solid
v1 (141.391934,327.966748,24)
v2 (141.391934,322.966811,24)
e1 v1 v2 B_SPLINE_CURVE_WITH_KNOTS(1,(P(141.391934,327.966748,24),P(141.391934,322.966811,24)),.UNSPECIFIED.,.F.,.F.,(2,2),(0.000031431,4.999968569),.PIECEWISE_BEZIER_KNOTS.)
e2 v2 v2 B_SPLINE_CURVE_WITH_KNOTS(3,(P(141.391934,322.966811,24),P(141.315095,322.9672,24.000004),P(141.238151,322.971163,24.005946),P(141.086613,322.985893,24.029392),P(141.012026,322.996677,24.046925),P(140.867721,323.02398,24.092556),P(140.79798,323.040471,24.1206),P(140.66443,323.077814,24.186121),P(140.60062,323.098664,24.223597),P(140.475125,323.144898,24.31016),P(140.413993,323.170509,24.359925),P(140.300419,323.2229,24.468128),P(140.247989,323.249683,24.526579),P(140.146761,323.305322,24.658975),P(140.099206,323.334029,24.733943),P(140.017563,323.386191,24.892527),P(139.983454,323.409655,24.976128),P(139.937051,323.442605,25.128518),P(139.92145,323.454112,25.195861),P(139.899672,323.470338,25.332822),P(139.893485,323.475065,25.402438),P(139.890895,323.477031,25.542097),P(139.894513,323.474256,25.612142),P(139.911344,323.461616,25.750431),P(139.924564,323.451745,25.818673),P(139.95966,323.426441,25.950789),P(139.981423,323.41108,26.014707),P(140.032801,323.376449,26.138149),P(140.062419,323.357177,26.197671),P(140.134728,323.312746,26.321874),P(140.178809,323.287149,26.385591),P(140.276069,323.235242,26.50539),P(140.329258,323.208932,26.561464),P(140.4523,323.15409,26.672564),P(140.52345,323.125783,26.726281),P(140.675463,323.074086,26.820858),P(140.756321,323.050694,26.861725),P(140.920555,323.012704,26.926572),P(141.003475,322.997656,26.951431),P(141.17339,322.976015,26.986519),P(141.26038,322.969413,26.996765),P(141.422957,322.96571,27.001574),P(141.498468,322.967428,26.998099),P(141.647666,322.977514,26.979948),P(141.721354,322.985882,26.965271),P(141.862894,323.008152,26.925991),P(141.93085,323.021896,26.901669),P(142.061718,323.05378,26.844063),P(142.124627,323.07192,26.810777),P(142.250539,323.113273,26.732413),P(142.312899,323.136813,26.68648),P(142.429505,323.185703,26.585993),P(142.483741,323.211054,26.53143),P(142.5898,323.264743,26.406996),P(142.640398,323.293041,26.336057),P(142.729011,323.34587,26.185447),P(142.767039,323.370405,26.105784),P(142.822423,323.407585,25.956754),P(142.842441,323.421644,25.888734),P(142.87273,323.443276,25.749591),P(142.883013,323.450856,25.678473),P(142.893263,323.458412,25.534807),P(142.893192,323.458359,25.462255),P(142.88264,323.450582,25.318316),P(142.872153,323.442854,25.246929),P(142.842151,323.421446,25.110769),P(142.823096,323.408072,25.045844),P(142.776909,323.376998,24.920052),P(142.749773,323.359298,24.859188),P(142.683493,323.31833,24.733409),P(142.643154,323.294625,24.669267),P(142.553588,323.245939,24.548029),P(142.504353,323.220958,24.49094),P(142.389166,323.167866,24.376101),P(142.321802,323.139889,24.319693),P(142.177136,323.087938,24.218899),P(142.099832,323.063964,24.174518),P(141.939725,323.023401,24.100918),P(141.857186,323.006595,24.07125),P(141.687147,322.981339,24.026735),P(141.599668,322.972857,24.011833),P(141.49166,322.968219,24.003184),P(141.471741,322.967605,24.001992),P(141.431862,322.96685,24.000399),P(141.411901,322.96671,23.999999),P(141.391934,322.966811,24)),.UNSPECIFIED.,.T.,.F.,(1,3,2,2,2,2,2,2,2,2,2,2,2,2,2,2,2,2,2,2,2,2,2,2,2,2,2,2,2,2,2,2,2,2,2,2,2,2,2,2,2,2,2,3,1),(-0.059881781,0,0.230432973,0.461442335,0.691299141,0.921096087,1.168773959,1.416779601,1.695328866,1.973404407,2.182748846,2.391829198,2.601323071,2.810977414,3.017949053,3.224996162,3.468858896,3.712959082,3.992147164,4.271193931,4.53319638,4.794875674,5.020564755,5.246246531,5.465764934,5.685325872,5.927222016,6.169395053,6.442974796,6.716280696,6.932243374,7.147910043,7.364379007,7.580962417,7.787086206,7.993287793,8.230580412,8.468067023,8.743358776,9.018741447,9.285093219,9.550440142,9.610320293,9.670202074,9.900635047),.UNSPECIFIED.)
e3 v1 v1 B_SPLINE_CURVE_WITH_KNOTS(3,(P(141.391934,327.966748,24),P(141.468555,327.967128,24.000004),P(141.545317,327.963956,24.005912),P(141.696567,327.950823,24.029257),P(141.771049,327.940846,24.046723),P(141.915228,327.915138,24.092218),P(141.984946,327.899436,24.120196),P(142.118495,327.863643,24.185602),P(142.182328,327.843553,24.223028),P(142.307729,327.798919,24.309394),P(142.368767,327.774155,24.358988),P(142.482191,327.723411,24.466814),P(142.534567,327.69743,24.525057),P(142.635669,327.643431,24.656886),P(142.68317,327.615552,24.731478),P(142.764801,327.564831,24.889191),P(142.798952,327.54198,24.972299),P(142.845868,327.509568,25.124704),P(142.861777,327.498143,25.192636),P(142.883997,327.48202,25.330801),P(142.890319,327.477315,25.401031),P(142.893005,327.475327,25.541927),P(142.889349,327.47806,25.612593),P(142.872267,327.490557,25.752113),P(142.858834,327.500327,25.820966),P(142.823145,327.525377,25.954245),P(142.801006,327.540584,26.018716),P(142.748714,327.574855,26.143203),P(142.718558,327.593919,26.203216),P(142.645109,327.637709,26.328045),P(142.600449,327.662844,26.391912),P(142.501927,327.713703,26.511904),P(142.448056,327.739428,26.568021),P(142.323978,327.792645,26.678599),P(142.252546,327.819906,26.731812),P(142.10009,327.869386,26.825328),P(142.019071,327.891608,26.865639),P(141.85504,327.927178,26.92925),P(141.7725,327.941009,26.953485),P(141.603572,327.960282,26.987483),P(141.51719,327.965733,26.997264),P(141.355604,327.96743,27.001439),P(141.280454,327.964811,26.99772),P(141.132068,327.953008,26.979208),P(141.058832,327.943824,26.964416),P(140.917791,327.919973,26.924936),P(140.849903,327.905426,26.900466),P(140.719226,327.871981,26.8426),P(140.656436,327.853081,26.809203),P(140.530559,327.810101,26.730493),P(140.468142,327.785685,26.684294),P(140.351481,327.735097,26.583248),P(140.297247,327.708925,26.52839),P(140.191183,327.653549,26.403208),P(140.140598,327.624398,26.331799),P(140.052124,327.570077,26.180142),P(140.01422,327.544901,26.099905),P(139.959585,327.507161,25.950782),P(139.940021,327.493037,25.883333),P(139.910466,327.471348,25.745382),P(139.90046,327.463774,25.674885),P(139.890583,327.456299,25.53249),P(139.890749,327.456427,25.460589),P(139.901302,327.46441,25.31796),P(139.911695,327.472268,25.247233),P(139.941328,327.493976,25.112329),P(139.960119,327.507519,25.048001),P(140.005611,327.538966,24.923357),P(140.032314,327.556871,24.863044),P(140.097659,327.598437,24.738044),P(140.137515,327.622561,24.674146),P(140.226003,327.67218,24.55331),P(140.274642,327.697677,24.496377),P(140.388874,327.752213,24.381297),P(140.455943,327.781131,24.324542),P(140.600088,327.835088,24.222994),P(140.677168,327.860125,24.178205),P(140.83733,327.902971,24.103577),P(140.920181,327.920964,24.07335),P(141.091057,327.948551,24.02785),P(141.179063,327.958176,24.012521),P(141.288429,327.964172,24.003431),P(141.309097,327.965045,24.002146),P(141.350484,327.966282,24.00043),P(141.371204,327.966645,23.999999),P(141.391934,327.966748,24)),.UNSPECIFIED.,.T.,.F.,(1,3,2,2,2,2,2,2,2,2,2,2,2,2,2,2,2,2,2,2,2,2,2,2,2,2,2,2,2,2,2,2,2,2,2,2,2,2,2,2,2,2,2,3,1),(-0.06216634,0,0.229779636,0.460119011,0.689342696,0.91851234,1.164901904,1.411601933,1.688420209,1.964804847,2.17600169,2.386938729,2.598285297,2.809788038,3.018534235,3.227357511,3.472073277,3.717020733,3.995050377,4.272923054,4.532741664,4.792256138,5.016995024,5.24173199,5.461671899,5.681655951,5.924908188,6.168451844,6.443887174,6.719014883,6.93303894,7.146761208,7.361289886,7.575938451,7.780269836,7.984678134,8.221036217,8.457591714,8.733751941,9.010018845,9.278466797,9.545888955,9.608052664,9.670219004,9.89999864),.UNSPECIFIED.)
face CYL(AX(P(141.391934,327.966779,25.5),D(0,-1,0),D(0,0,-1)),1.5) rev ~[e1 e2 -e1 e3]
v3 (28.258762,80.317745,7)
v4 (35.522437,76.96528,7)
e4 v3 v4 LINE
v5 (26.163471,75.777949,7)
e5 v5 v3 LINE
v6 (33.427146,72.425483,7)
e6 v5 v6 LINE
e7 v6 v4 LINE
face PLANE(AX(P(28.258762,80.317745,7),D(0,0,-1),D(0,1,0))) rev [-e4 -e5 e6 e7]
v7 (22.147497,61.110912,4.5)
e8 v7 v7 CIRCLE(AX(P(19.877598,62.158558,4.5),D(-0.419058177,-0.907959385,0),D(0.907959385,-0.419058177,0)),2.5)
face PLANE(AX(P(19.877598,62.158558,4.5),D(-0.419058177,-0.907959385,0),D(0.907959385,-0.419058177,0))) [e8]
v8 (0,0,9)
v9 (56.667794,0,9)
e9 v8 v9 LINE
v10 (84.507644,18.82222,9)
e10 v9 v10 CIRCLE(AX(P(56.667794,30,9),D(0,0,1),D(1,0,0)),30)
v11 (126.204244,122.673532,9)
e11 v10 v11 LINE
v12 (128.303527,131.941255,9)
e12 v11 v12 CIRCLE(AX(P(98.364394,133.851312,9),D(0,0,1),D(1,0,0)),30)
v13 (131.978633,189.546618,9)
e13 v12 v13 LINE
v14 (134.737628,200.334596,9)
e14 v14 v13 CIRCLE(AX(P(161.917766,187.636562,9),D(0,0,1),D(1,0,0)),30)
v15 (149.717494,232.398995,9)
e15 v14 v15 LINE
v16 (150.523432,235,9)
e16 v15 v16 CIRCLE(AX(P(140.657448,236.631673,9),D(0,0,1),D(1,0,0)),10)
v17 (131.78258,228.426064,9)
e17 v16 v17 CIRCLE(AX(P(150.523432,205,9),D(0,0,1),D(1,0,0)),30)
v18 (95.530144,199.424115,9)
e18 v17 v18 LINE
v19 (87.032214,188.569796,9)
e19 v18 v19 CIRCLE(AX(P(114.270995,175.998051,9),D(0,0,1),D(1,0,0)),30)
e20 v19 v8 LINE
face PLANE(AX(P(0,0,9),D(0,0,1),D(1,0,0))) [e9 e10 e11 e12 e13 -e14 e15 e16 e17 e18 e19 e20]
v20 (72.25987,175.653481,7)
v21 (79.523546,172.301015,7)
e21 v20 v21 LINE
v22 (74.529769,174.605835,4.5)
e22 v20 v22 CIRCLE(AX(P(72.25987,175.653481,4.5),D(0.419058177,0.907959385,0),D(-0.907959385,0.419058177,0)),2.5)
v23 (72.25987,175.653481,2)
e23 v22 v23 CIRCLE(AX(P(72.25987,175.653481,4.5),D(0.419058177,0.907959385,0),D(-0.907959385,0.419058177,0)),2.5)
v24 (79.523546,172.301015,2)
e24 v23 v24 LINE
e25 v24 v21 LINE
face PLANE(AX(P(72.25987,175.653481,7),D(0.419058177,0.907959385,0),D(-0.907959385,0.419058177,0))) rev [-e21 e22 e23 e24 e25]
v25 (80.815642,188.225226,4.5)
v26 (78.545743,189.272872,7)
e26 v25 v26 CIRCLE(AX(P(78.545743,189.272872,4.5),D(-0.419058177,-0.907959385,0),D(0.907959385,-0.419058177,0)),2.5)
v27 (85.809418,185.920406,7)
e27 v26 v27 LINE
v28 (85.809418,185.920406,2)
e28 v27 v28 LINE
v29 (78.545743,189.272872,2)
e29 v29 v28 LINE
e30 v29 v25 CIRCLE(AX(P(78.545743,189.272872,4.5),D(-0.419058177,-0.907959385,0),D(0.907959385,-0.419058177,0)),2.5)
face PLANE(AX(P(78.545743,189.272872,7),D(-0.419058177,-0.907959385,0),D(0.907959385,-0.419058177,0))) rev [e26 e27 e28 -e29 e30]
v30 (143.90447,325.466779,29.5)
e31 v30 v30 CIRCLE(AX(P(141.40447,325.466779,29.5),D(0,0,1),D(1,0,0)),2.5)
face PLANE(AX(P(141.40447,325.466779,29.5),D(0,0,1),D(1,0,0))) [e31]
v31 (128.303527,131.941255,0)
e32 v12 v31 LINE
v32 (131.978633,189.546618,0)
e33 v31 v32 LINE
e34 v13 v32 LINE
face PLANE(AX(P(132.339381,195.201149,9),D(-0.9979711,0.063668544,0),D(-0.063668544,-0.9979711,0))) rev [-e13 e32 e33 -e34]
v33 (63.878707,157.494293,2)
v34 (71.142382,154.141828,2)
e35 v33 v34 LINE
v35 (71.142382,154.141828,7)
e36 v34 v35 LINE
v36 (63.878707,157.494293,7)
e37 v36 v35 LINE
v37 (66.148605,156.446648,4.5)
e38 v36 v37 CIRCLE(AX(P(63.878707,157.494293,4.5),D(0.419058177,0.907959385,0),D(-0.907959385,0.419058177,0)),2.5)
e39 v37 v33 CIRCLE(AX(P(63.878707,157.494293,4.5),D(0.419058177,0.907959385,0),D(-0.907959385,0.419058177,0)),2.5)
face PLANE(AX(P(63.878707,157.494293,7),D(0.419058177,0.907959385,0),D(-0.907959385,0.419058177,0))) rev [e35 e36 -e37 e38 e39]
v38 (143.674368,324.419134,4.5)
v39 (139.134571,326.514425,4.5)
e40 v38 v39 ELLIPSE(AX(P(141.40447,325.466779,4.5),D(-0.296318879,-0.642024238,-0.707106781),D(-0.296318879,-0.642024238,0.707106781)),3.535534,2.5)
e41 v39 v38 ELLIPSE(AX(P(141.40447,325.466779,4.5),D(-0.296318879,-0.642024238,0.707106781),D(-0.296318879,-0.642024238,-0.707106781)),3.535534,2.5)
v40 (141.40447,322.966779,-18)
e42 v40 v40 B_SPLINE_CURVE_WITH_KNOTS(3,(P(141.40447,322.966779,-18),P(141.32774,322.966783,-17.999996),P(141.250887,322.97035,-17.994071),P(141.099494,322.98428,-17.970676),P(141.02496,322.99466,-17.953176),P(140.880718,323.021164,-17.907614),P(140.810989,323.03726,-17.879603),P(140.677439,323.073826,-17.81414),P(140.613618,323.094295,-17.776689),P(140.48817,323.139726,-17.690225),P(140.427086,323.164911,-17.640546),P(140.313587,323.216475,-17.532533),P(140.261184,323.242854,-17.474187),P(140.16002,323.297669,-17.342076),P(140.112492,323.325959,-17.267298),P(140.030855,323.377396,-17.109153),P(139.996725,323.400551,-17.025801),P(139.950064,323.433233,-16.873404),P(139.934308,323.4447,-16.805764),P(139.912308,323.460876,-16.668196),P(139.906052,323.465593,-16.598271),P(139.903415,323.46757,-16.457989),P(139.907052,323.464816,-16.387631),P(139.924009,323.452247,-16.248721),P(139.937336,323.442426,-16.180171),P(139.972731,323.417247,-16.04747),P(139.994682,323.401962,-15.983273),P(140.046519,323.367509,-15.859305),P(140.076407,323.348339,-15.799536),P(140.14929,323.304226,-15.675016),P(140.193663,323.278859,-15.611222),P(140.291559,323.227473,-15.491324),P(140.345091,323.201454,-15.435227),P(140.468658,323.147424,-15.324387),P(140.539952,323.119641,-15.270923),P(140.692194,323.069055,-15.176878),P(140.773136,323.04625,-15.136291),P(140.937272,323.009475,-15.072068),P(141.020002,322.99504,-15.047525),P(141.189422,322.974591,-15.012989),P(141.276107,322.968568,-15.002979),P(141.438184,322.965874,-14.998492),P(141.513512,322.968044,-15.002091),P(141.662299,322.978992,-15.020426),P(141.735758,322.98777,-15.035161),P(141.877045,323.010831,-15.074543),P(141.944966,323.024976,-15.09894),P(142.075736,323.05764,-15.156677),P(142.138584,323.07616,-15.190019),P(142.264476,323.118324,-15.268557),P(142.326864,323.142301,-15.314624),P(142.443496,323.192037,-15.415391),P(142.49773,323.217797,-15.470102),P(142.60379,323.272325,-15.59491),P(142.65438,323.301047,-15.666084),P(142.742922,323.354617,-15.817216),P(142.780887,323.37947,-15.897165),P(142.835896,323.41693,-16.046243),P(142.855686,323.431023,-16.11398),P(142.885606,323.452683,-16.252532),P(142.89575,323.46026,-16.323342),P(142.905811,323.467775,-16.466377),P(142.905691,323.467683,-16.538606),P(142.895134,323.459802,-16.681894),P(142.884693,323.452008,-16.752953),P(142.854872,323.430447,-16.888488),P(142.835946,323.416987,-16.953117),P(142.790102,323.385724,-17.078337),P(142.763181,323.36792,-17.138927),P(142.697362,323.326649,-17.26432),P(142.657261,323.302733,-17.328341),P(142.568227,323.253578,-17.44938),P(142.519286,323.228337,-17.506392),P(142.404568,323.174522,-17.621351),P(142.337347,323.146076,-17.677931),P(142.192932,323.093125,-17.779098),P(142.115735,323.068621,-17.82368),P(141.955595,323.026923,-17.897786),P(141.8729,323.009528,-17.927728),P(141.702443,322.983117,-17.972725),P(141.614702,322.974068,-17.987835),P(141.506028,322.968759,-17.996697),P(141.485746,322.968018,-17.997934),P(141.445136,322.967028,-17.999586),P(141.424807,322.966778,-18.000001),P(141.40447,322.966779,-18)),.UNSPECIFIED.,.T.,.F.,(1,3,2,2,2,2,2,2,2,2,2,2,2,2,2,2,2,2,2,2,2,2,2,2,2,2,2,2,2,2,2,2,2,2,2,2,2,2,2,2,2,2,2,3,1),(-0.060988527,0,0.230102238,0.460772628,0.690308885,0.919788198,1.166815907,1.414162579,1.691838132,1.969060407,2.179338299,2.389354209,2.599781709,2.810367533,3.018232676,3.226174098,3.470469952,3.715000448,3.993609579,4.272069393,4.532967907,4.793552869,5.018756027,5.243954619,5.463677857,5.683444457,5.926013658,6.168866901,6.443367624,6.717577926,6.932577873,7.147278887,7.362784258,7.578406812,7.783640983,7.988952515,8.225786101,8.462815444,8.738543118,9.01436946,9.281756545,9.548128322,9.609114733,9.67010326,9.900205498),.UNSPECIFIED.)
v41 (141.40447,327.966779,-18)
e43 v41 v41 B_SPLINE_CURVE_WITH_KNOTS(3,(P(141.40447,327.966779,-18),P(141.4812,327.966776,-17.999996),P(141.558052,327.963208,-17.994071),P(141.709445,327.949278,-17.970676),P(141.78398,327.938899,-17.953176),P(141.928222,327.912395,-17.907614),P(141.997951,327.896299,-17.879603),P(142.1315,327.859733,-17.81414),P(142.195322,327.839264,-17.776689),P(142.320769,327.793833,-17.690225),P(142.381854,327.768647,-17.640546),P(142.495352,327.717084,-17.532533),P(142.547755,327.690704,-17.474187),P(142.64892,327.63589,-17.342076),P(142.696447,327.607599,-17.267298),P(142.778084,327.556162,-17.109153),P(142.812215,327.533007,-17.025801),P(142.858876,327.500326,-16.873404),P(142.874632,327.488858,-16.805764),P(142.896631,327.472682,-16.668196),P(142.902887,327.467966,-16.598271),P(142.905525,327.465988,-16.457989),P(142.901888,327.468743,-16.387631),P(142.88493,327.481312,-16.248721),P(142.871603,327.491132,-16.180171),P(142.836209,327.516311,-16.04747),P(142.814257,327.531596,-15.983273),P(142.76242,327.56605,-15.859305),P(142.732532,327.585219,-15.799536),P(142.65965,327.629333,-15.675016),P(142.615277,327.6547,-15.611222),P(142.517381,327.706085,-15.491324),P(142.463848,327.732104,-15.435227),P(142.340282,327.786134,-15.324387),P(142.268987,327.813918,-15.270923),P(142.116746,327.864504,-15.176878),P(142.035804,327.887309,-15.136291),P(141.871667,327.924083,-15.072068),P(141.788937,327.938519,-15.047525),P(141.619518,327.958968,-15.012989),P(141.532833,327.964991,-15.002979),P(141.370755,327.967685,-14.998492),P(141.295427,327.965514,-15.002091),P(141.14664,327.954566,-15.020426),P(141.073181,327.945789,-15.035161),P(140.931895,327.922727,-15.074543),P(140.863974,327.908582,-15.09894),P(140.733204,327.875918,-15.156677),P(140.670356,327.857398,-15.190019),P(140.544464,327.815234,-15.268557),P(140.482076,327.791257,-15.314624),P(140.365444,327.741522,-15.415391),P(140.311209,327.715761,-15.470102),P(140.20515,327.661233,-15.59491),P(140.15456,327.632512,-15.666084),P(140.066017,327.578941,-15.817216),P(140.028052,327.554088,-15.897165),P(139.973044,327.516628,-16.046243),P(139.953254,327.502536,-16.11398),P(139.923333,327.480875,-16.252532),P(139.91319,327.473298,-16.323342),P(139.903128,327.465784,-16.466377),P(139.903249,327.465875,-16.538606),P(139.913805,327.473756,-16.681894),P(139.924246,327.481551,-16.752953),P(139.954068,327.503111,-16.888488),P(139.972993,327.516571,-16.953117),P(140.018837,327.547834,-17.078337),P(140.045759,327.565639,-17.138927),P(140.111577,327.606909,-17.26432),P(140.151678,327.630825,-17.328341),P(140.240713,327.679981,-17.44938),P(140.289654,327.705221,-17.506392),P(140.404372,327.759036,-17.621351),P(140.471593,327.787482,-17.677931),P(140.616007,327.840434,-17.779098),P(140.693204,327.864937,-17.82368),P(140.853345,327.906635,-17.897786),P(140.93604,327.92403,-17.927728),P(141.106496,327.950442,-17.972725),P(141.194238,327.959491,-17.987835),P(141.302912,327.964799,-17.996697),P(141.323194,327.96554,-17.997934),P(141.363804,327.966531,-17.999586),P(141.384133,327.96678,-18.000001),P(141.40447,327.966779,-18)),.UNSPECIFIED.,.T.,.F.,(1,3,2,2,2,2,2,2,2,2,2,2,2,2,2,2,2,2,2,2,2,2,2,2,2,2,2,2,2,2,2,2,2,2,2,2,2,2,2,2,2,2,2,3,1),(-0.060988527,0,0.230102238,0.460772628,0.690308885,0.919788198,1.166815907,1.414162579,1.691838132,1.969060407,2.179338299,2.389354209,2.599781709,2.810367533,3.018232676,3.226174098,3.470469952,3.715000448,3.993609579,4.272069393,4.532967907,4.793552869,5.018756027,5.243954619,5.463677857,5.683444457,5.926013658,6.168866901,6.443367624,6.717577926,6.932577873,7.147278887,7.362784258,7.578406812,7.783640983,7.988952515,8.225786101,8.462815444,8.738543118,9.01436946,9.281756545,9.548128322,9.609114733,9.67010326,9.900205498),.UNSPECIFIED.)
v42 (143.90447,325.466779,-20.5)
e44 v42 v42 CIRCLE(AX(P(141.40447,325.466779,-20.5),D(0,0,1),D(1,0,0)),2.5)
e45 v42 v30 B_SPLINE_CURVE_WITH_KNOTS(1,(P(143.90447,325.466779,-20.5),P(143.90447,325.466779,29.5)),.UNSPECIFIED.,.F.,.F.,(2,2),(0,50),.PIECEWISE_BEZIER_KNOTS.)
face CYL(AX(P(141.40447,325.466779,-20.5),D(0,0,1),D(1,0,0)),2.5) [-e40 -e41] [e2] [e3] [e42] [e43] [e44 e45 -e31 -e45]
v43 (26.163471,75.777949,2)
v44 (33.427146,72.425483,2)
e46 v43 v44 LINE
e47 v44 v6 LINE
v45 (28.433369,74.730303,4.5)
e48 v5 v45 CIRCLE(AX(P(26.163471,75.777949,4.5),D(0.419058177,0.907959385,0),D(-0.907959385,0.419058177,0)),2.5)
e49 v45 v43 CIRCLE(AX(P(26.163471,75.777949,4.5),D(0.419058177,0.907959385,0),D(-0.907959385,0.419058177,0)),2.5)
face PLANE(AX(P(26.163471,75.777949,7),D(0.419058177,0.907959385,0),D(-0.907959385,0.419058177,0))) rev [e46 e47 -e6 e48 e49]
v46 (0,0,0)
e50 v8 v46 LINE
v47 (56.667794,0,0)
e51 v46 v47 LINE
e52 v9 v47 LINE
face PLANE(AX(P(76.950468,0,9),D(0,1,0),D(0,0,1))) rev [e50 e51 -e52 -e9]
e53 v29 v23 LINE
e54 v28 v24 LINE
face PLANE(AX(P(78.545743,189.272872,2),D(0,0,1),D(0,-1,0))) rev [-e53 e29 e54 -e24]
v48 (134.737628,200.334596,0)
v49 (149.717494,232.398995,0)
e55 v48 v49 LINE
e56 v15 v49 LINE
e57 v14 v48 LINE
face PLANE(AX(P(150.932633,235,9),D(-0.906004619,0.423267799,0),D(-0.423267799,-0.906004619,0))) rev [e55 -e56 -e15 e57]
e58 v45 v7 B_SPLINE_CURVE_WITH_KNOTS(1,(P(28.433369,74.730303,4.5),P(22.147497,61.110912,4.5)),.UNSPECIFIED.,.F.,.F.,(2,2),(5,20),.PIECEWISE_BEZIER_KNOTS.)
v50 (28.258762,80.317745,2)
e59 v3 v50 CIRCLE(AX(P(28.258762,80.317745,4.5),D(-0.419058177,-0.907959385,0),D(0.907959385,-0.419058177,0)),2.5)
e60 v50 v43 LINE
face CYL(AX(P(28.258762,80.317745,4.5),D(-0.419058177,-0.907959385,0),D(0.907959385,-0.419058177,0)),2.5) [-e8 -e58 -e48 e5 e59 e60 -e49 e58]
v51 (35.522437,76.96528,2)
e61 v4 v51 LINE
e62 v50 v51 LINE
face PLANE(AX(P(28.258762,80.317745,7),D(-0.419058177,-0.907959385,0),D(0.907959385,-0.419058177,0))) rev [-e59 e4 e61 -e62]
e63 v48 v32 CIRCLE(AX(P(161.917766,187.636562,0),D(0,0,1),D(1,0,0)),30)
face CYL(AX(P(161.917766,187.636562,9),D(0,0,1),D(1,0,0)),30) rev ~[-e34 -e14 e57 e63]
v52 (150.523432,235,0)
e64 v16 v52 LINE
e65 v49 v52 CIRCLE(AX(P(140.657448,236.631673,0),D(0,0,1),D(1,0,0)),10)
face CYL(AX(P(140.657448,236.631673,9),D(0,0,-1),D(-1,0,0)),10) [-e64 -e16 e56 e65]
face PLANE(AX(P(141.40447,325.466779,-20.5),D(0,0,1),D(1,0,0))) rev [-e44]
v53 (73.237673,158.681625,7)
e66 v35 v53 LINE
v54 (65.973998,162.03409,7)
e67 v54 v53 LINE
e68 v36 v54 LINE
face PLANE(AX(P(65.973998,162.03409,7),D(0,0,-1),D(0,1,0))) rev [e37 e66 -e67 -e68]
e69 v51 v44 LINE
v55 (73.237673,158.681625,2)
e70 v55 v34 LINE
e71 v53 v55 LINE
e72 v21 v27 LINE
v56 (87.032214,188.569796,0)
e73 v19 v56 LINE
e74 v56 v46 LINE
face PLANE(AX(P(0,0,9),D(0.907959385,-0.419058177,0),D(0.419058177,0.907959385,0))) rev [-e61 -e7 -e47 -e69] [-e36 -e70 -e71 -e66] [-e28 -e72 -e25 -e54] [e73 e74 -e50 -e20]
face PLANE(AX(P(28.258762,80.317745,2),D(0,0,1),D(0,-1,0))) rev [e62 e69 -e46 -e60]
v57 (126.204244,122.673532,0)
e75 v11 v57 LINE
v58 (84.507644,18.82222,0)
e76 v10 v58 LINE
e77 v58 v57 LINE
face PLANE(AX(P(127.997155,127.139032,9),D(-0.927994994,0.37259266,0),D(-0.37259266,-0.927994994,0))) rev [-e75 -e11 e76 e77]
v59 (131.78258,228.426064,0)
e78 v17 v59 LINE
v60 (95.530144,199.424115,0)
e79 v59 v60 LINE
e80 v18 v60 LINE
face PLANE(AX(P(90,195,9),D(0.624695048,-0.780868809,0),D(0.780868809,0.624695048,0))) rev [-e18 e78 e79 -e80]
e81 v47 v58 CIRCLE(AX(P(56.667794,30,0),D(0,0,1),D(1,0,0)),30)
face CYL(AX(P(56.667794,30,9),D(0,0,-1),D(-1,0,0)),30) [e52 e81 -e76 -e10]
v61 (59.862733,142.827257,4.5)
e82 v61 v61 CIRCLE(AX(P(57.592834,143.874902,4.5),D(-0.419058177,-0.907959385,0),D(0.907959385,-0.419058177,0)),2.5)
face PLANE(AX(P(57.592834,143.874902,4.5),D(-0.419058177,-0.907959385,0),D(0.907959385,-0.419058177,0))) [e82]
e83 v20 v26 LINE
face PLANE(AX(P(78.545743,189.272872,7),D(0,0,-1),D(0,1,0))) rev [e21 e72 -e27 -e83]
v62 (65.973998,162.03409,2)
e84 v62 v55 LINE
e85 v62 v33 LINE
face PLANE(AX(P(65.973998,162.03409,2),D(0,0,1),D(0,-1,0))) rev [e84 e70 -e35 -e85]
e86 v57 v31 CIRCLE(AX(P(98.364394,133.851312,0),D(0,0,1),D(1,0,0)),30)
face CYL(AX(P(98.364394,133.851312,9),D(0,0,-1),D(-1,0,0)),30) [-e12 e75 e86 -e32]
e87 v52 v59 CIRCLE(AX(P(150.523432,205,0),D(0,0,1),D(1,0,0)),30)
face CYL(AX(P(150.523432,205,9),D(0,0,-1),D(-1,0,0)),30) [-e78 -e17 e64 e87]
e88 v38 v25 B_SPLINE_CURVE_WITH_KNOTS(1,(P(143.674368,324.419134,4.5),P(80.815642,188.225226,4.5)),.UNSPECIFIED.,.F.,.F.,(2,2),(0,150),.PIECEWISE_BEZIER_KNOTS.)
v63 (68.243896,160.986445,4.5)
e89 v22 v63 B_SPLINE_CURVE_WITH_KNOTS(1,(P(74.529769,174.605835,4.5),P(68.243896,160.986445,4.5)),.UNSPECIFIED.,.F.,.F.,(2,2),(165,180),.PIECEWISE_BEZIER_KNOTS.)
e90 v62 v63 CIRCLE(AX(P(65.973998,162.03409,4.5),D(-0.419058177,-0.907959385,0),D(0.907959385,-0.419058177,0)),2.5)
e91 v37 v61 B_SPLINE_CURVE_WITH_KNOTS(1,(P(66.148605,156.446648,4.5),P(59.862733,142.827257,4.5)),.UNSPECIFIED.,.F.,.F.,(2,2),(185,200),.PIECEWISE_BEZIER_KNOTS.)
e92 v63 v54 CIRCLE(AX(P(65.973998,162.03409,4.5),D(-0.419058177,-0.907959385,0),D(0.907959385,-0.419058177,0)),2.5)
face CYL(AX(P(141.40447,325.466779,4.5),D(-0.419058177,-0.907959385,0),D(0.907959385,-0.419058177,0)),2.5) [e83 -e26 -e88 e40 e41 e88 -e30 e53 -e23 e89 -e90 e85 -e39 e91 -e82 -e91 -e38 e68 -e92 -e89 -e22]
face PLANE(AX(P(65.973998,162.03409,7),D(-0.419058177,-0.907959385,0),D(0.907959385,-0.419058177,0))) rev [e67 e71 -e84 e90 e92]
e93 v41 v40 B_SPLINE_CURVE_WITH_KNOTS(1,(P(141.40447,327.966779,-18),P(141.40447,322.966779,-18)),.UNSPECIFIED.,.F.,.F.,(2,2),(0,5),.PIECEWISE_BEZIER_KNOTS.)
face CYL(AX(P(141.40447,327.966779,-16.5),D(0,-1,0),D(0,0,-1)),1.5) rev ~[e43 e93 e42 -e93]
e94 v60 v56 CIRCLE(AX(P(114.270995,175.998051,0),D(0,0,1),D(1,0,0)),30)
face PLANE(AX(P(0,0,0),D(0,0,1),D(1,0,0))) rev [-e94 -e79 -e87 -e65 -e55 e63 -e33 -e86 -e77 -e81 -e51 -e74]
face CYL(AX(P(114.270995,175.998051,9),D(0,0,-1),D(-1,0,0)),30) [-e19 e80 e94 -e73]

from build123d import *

# Parameters (mm, degrees)
BOSS_EXTRU_1_DEPTH           = 9
ESQUISSE36_W                 = 5
ESQUISSE36_H                 = 5
ESQUISSE36_H_2               = 15
BOSS_EXTRU_4_DEPTH           = 8
BALAYAGE2_PROFILE_R          = 2.5
BALAYAGE3_PROFILE_R          = 2.5
CONG_2_R                     = 30
CONG_3_R                     = 10
BALAYAGE4_PROFILE_R          = 2.5
ENL_V_MAT_EXTRU_2_DEPTH      = 363.063201398
ENL_V_MAT_EXTRU_2_DEPTH_BACK = 10
ESQUISSE103_R                = 1.5


with BuildPart() as part:
    # Esquisse1 → Boss.-Extru.1 (new body)
    with BuildSketch(Plane.XY):
        Polygon((0, 0), (90, 195), (140, 235), (150.932632942, 235), (132.339381175, 195.201149163), (127.997155304, 127.139031538), (76.950468366, 0), align=None)
    extrude(amount=BOSS_EXTRU_1_DEPTH)

    # Esquisse36 → Boss.-Extru.4 (add)
    with BuildSketch(Plane(origin=(0, 0, 0), x_dir=(0, 0, 1), z_dir=(-0.9079593845004518, 0.4190581774617469, 0))):
        with Locations((4.5, 172.267315949)):
            Rectangle(ESQUISSE36_W, ESQUISSE36_H)
        with Locations((4.5, 82.267315949)):
            Rectangle(ESQUISSE36_W, ESQUISSE36_H)
        with Locations((4.5, 197.267315949)):
            Rectangle(ESQUISSE36_W, ESQUISSE36_H_2)
    extrude(amount=BOSS_EXTRU_4_DEPTH)

    # Balayage2: sweep along a path in Esquisse37
    with BuildLine(Plane(origin=(-7.263675076, 3.35246542, 0), x_dir=(0, 0, 1), z_dir=(-0.9079593845004523, 0.4190581774617459, 0))) as balayage2_path:
        Line((4.5, 354.767315949), (4.5, 154.767315949))
    # Balayage2 profile (on start of the path) → Balayage2 (sweep)
    with BuildSketch(Plane(origin=(141.404469769, 325.46677925, 4.5), x_dir=(-0.9079593845004521, 0.41905817746174584, 0), z_dir=(-0.4190581774617459, -0.9079593845004523, 0))):
        Circle(BALAYAGE2_PROFILE_R)
    sweep(path=balayage2_path.line)

    # Balayage3: sweep along a path in Esquisse50
    with BuildLine(Plane(origin=(-7.263675076, 3.35246542, 0), x_dir=(0, 0, 1), z_dir=(-0.9079593845004512, 0.41905817746174806, 0))) as balayage3_path:
        Line((4.5, 84.767315949), (4.5, 64.767315949))
    # Balayage3 profile (on start of the path) → Balayage3 (sweep)
    with BuildSketch(Plane(origin=(28.258761854, 80.317745435, 4.5), x_dir=(-0.9079593845004512, 0.41905817746174806, 0), z_dir=(-0.41905817746174806, -0.9079593845004512, 0))):
        Circle(BALAYAGE3_PROFILE_R)
    sweep(path=balayage3_path.line)

    # Congé2
    cong_2_edges = [part.edges().sort_by_distance(p)[0] for p in [
        (90, 195, 4.5),
        (140, 235, 4.5),
        (132.339381175, 195.201149163, 4.5),
        (127.997155304, 127.139031538, 4.5),
        (76.950468366, 0, 4.5),
    ]]
    fillet(cong_2_edges, radius=CONG_2_R)

    # Congé3
    # the kernel refuses this fillet: 10 mm, written as the material it takes off along each edge
    with BuildSketch(Plane(origin=(150.932632942, 235, -7.177129448), x_dir=(-1, 0, 0), z_dir=(0, 0, 1))) as cong_3_piece_1:
        with BuildLine():
            CenterArc((10.275185308, -1.631673015), CONG_3_R, 154.958930111, 15.650284086)
            Line((1.215139114, 2.601004974), (0, 0))
            Line((0, 0), (0.409201162, 0))
        make_face()
    extrude(amount=23.354258897, mode=Mode.SUBTRACT)

    # Balayage4: sweep along a path in Esquisse88
    with BuildLine(Plane(origin=(148.668144845, 322.11431383, 0), x_dir=(0.907959384500452, -0.4190581774617463, 0), z_dir=(0.41905817746174623, 0.9079593845004519, 0))) as balayage4_path:
        Line((-8, 20.5), (-8, -29.5))
    # Balayage4 profile (on start of the path) → Balayage4 (sweep)
    with BuildSketch(Plane(origin=(141.404469769, 325.46677925, -20.5), x_dir=(0, 1, 0), z_dir=(0, 0, 1))):
        Circle(BALAYAGE4_PROFILE_R)
    sweep(path=balayage4_path.line)

    # Esquisse103 → Enlèv. mat.-Extru.2 (cut, two sides: drawn at the far end of the back side and taken through both)
    with BuildSketch(Plane(origin=(0, 0, 0), x_dir=(1, 0, 0), z_dir=(0, 1, 0)).offset(-ENL_V_MAT_EXTRU_2_DEPTH_BACK)):
        with Locations(Location((141.404469769, 16.5, 0), (0, 0, 90))):
            Circle(ESQUISSE103_R)
        with Locations(Location((141.391933609, -25.5, 0), (0, 0, 90))):
            Circle(ESQUISSE103_R)
    extrude(amount=ENL_V_MAT_EXTRU_2_DEPTH + ENL_V_MAT_EXTRU_2_DEPTH_BACK, mode=Mode.SUBTRACT)


solid = part.part
